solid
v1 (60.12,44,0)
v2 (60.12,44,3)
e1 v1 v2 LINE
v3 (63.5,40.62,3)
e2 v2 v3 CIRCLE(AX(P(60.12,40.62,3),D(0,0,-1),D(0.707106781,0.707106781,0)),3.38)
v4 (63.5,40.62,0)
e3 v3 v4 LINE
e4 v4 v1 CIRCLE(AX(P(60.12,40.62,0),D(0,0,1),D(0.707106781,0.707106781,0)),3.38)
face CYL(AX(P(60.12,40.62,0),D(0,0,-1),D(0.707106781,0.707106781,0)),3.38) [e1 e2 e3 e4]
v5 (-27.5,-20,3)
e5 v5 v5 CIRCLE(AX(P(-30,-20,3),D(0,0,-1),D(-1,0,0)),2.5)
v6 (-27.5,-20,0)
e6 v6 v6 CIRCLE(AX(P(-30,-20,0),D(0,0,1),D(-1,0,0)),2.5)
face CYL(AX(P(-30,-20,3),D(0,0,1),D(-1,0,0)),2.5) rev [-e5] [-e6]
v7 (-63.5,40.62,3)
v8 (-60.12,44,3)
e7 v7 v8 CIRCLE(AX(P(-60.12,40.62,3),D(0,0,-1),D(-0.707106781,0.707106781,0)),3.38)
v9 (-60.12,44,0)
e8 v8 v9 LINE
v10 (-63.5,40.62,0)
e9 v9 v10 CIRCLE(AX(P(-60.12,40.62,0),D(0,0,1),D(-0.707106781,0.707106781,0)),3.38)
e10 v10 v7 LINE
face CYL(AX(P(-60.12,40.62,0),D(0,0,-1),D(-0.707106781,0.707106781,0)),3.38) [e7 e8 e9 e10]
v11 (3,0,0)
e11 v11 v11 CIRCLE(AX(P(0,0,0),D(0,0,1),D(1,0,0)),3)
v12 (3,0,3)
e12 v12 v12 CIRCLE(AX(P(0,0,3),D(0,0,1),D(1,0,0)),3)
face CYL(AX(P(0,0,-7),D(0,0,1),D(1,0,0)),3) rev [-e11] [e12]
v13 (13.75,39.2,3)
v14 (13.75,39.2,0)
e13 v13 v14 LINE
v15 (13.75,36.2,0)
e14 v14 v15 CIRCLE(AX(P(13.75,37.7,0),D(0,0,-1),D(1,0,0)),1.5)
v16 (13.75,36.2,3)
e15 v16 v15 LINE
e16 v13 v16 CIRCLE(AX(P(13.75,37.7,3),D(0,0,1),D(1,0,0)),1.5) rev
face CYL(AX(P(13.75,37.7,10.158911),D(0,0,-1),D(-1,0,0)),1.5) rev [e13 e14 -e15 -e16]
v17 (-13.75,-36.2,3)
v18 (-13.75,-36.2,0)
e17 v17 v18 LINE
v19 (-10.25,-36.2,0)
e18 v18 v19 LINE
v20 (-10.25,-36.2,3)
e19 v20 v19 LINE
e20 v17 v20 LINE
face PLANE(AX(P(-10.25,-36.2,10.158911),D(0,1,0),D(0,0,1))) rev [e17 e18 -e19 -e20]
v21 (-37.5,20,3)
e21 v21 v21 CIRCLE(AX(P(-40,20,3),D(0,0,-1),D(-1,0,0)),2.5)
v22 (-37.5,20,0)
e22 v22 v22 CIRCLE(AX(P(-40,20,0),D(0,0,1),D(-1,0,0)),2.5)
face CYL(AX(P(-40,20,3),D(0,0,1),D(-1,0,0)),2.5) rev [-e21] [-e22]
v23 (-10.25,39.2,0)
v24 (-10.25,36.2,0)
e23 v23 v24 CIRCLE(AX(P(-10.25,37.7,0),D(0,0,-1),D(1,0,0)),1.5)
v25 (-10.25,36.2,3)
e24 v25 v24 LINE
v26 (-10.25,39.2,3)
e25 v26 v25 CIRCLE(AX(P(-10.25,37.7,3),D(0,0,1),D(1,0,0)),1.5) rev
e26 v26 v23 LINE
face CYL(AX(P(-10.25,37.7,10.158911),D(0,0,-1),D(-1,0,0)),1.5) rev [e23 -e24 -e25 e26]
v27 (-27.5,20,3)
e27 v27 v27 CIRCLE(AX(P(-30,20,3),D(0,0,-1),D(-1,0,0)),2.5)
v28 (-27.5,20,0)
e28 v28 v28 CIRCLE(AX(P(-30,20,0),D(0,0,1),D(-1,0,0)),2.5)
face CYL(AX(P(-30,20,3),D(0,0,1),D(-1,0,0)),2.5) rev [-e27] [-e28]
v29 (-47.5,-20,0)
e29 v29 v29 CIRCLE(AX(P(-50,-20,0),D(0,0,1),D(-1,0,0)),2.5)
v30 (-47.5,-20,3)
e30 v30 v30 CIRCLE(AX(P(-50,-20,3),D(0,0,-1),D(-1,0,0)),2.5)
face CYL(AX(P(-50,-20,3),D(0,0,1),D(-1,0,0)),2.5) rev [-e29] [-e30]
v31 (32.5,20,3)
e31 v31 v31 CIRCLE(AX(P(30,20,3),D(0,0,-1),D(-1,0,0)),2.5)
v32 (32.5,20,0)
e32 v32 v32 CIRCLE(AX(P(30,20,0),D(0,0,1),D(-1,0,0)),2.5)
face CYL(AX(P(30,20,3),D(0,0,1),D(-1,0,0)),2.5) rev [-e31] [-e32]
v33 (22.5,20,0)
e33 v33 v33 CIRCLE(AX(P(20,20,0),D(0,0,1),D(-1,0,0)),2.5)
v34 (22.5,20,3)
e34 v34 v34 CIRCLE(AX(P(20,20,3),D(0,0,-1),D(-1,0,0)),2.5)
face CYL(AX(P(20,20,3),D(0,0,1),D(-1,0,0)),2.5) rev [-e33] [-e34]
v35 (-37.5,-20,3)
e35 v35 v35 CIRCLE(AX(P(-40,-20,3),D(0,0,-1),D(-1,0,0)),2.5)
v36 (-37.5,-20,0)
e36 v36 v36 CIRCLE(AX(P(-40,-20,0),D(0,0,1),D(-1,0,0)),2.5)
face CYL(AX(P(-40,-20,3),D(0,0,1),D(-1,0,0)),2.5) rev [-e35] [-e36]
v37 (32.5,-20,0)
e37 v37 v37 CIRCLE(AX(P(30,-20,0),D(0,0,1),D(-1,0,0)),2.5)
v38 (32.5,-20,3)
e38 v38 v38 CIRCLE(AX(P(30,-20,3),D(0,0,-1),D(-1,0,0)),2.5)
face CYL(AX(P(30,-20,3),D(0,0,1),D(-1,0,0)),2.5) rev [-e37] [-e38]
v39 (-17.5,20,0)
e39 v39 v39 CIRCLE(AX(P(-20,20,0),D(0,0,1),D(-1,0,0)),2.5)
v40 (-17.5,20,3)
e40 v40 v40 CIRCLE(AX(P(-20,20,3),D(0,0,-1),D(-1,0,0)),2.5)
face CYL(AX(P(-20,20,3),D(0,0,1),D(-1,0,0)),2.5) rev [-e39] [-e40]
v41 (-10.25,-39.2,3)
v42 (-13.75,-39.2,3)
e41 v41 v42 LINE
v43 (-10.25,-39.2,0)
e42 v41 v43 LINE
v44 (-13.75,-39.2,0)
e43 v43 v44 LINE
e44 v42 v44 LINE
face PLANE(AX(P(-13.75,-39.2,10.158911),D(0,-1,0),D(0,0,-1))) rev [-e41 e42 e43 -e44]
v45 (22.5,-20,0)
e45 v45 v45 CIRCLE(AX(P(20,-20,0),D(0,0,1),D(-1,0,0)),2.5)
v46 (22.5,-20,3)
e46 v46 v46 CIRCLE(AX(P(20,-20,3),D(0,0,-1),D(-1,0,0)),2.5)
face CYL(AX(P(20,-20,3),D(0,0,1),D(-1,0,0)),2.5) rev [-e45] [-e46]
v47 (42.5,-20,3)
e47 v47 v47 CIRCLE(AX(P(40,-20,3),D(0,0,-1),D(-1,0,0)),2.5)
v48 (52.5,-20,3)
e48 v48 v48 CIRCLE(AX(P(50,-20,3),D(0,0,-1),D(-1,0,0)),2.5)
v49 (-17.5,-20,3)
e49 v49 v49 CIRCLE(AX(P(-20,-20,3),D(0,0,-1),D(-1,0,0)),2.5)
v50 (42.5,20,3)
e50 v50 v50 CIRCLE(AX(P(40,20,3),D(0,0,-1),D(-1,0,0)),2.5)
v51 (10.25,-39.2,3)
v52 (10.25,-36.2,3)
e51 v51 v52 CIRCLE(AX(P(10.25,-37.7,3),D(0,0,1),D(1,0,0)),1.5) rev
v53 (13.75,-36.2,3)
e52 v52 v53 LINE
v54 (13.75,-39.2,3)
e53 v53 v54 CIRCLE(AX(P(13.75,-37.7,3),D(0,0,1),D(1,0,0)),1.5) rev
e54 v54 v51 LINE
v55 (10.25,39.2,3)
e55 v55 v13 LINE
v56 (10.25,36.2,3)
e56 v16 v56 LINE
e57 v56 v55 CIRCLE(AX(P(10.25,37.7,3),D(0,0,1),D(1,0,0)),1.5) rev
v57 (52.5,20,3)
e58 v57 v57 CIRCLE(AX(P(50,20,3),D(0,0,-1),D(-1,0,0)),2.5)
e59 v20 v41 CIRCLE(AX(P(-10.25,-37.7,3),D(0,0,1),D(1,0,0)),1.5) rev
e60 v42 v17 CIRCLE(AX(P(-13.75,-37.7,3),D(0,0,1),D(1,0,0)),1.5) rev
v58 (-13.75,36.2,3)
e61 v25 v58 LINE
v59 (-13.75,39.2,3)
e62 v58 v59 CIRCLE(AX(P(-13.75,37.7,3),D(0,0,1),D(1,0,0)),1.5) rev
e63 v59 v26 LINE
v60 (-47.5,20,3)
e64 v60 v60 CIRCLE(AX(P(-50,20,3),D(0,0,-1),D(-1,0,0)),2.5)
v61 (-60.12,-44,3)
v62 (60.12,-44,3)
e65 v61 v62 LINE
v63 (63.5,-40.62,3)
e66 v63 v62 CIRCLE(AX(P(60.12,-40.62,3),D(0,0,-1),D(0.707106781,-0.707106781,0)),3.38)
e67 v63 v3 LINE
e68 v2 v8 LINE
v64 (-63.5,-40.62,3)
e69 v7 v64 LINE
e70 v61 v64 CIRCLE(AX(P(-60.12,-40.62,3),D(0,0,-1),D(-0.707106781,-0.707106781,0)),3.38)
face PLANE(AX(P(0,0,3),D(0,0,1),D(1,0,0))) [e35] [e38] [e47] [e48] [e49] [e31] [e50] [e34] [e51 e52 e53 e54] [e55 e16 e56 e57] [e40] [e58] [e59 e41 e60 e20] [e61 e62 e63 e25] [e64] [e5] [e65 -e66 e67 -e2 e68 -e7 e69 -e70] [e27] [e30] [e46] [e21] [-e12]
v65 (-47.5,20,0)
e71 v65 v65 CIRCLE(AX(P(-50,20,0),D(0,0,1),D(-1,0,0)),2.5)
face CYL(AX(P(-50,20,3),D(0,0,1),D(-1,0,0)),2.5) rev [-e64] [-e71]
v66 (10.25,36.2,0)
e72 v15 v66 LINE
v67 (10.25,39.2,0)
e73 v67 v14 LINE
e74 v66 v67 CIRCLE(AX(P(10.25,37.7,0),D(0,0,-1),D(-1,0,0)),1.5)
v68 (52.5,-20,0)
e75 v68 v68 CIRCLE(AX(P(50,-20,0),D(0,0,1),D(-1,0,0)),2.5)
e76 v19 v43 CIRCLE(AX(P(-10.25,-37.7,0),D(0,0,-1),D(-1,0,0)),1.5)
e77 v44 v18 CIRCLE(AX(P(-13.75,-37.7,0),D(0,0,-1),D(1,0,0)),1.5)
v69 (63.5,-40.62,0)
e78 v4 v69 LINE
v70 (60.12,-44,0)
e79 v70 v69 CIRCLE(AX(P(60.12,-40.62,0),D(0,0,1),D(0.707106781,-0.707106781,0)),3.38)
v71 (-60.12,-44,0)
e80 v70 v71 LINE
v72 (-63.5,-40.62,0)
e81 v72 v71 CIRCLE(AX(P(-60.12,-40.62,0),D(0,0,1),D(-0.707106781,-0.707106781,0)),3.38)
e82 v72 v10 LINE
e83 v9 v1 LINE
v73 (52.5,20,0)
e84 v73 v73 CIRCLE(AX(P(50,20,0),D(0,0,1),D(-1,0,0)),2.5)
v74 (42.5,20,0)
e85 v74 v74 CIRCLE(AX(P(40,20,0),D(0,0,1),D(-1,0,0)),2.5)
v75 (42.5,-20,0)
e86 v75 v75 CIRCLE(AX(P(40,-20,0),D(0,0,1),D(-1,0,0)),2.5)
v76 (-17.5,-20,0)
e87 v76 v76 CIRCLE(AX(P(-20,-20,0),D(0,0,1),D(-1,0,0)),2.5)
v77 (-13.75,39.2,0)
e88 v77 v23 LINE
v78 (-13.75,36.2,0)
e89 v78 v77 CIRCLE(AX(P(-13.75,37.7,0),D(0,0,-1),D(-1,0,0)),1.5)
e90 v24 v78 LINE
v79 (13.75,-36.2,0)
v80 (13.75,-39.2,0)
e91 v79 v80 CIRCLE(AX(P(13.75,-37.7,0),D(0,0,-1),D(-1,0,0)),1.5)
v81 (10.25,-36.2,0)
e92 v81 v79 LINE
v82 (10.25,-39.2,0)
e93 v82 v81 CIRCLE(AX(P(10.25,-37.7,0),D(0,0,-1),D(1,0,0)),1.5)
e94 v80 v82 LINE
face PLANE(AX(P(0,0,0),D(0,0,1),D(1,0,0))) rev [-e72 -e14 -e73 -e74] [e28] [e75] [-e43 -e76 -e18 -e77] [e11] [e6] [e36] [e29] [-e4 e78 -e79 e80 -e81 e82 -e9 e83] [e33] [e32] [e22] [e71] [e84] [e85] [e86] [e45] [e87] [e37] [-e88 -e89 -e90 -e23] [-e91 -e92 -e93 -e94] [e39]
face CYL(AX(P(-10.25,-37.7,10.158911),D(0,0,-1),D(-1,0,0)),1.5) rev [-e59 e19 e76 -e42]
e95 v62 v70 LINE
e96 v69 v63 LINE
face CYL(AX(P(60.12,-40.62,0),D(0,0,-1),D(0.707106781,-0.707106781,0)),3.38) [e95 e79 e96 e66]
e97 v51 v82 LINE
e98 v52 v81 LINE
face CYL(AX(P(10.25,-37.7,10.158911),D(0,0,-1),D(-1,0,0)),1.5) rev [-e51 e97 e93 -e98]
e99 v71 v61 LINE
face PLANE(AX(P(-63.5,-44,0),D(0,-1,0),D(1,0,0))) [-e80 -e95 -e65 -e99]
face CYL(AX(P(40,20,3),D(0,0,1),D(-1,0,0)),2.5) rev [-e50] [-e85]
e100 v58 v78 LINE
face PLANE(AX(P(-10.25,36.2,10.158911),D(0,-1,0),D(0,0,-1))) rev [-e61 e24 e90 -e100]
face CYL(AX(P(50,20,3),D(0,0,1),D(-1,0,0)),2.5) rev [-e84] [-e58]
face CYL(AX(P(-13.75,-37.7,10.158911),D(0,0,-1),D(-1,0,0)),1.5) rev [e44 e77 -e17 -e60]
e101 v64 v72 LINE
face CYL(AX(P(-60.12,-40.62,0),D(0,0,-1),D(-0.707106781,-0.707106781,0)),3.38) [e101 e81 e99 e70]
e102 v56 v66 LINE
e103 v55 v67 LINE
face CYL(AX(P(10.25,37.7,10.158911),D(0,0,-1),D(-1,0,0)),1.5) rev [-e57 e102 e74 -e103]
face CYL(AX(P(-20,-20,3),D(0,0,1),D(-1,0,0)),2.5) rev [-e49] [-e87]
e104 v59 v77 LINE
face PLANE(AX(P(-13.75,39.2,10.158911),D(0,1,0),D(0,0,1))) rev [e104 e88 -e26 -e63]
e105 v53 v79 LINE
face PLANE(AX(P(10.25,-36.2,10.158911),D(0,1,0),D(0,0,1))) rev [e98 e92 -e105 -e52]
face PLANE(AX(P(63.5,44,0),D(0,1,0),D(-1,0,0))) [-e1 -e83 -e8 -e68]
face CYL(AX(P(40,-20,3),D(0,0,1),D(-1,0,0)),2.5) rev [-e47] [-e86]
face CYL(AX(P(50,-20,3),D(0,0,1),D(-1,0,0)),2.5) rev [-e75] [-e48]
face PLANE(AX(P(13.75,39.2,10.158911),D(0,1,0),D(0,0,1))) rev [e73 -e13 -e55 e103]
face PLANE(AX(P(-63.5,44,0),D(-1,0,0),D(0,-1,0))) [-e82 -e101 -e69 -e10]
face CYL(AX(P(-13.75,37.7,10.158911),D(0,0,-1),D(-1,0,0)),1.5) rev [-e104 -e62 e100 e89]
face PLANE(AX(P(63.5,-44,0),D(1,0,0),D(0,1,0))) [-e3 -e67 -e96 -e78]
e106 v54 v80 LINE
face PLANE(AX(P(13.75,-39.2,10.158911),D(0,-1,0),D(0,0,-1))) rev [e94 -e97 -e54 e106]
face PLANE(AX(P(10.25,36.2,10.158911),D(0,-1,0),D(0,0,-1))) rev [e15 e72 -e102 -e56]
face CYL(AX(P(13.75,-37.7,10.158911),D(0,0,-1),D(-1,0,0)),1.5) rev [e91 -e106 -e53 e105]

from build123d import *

# Parameters (mm, degrees)
CUT_EXTRUDE1_START       = -3
CUT_EXTRUDE1_OUTLINE_R   = 2.5
CUT_EXTRUDE1_OUTLINE_R_2 = 3.6
CUT_EXTRUDE1_OUTLINE_R_3 = 3
CUT_EXTRUDE1_DEPTH       = 3
SKETCH2_R                = 3.6
SKETCH2_R_2              = 3.600483305
SKETCH2_R_3              = 2.5
BOSS_EXTRUDE2_DEPTH      = 3
BOSS_EXTRUDE3_DEPTH      = 3
CUT_EXTRUDE2_REACH       = 79.313
BOSS_EXTRUDE4_DEPTH      = 3
BOSS_EXTRUDE5_DEPTH      = 3


with BuildPart() as part:
    # Cut-Extrude1: read off the stored shape, not the designer's step
    # Cut-Extrude1 outline → Cut-Extrude1 (new body)
    with BuildSketch(Plane.XY.offset(3).offset(CUT_EXTRUDE1_START)):
        with BuildLine():
            ThreePointArc((-60.12, 44), (-62.51002092, 43.01002092), (-63.5, 40.62))
            Line((-63.5, 40.62), (-63.5, -40.62))
            ThreePointArc((-63.5, -40.62), (-62.51002092, -43.01002092), (-60.12, -44))
            Line((-60.12, -44), (60.12, -44))
            ThreePointArc((60.12, -44), (62.51002092, -43.01002092), (63.5, -40.62))
            Line((63.5, -40.62), (63.5, 40.62))
            ThreePointArc((63.5, 40.62), (62.51002092, 43.01002092), (60.12, 44))
            Line((60.12, 44), (-60.12, 44))
        make_face()
        with Locations((-50, -30)):
            Circle(CUT_EXTRUDE1_OUTLINE_R, mode=Mode.SUBTRACT)
        with Locations((-40, -30)):
            Circle(CUT_EXTRUDE1_OUTLINE_R, mode=Mode.SUBTRACT)
        with BuildLine():
            ThreePointArc((-16.9, -36.2), (-15.4, -37.7), (-16.9, -39.2))
            Line((-16.9, -39.2), (-23.4, -39.2))
            ThreePointArc((-23.4, -39.2), (-24.9, -37.7), (-23.4, -36.2))
            Line((-23.4, -36.2), (-16.9, -36.2))
        make_face(mode=Mode.SUBTRACT)
        with Locations((-30, -30)):
            Circle(CUT_EXTRUDE1_OUTLINE_R, mode=Mode.SUBTRACT)
        with Locations((-20, -30)):
            Circle(CUT_EXTRUDE1_OUTLINE_R, mode=Mode.SUBTRACT)
        with Locations((-50, -20)):
            Circle(CUT_EXTRUDE1_OUTLINE_R, mode=Mode.SUBTRACT)
        with Locations((-40, -20)):
            Circle(CUT_EXTRUDE1_OUTLINE_R, mode=Mode.SUBTRACT)
        with Locations((-30, -20)):
            Circle(CUT_EXTRUDE1_OUTLINE_R, mode=Mode.SUBTRACT)
        with Locations((-20, -20)):
            Circle(CUT_EXTRUDE1_OUTLINE_R, mode=Mode.SUBTRACT)
        with Locations((-10, -20)):
            Circle(CUT_EXTRUDE1_OUTLINE_R, mode=Mode.SUBTRACT)
        with Locations((-14.142135624, -14.142135624)):
            Circle(CUT_EXTRUDE1_OUTLINE_R, mode=Mode.SUBTRACT)
        with Locations((-30, -10)):
            Circle(CUT_EXTRUDE1_OUTLINE_R, mode=Mode.SUBTRACT)
        with Locations((-20, -10)):
            Circle(CUT_EXTRUDE1_OUTLINE_R, mode=Mode.SUBTRACT)
        with BuildLine():
            ThreePointArc((-3.25, -39.2), (-4.75, -37.7), (-3.25, -36.2))
            Line((-3.25, -36.2), (3.25, -36.2))
            ThreePointArc((3.25, -36.2), (4.75, -37.7), (3.25, -39.2))
            Line((3.25, -39.2), (-3.25, -39.2))
        make_face(mode=Mode.SUBTRACT)
        with BuildLine():
            ThreePointArc((23.4, -36.2), (24.9, -37.7), (23.4, -39.2))
            Line((23.4, -39.2), (16.9, -39.2))
            ThreePointArc((16.9, -39.2), (15.4, -37.7), (16.9, -36.2))
            Line((16.9, -36.2), (23.4, -36.2))
        make_face(mode=Mode.SUBTRACT)
        with BuildLine():
            ThreePointArc((10, -27.5), (12.5, -30), (10, -32.5))
            Line((10, -32.5), (-10, -32.5))
            ThreePointArc((-10, -32.5), (-12.5, -30), (-10, -27.5))
            Line((-10, -27.5), (10, -27.5))
        make_face(mode=Mode.SUBTRACT)
        with Locations((20, -30)):
            Circle(CUT_EXTRUDE1_OUTLINE_R_2, mode=Mode.SUBTRACT)
        with Locations((30, -30)):
            Circle(CUT_EXTRUDE1_OUTLINE_R_2, mode=Mode.SUBTRACT)
        with Locations((40, -30)):
            Circle(CUT_EXTRUDE1_OUTLINE_R_2, mode=Mode.SUBTRACT)
        with Locations((50, -30)):
            Circle(CUT_EXTRUDE1_OUTLINE_R_2, mode=Mode.SUBTRACT)
        with Locations((0, -20)):
            Circle(CUT_EXTRUDE1_OUTLINE_R, mode=Mode.SUBTRACT)
        with Locations((10, -20)):
            Circle(CUT_EXTRUDE1_OUTLINE_R, mode=Mode.SUBTRACT)
        with Locations((14.142135624, -14.142135624)):
            Circle(CUT_EXTRUDE1_OUTLINE_R, mode=Mode.SUBTRACT)
        with Locations((20, -20)):
            Circle(CUT_EXTRUDE1_OUTLINE_R, mode=Mode.SUBTRACT)
        with Locations((30, -20)):
            Circle(CUT_EXTRUDE1_OUTLINE_R, mode=Mode.SUBTRACT)
        with Locations((0, -10)):
            Circle(CUT_EXTRUDE1_OUTLINE_R, mode=Mode.SUBTRACT)
        with Locations((20, -10)):
            Circle(CUT_EXTRUDE1_OUTLINE_R, mode=Mode.SUBTRACT)
        with Locations((30, -10)):
            Circle(CUT_EXTRUDE1_OUTLINE_R, mode=Mode.SUBTRACT)
        with Locations((40, -20)):
            Circle(CUT_EXTRUDE1_OUTLINE_R, mode=Mode.SUBTRACT)
        with Locations((50, -20)):
            Circle(CUT_EXTRUDE1_OUTLINE_R, mode=Mode.SUBTRACT)
        with Locations((-50, 0)):
            Circle(CUT_EXTRUDE1_OUTLINE_R, mode=Mode.SUBTRACT)
        with Locations((-40, 0)):
            Circle(CUT_EXTRUDE1_OUTLINE_R, mode=Mode.SUBTRACT)
        with Locations((-50, 20)):
            Circle(CUT_EXTRUDE1_OUTLINE_R, mode=Mode.SUBTRACT)
        with Locations((-40, 20)):
            Circle(CUT_EXTRUDE1_OUTLINE_R, mode=Mode.SUBTRACT)
        with Locations((-30, 0)):
            Circle(CUT_EXTRUDE1_OUTLINE_R, mode=Mode.SUBTRACT)
        with Locations((-20, 0)):
            Circle(CUT_EXTRUDE1_OUTLINE_R, mode=Mode.SUBTRACT)
        with Locations((-30, 10)):
            Circle(CUT_EXTRUDE1_OUTLINE_R, mode=Mode.SUBTRACT)
        with Locations((-20, 10)):
            Circle(CUT_EXTRUDE1_OUTLINE_R, mode=Mode.SUBTRACT)
        with Locations((-10, 0)):
            Circle(CUT_EXTRUDE1_OUTLINE_R, mode=Mode.SUBTRACT)
        with Locations((-30, 20)):
            Circle(CUT_EXTRUDE1_OUTLINE_R, mode=Mode.SUBTRACT)
        with Locations((-20, 20)):
            Circle(CUT_EXTRUDE1_OUTLINE_R, mode=Mode.SUBTRACT)
        with Locations((-14.142135624, 14.142135624)):
            Circle(CUT_EXTRUDE1_OUTLINE_R, mode=Mode.SUBTRACT)
        with Locations((-10, 20)):
            Circle(CUT_EXTRUDE1_OUTLINE_R, mode=Mode.SUBTRACT)
        with Locations((-50, 30)):
            Circle(CUT_EXTRUDE1_OUTLINE_R, mode=Mode.SUBTRACT)
        with Locations((-40, 30)):
            Circle(CUT_EXTRUDE1_OUTLINE_R, mode=Mode.SUBTRACT)
        with Locations((-30, 30)):
            Circle(CUT_EXTRUDE1_OUTLINE_R, mode=Mode.SUBTRACT)
        with Locations((-20, 30)):
            Circle(CUT_EXTRUDE1_OUTLINE_R, mode=Mode.SUBTRACT)
        with BuildLine():
            ThreePointArc((-23.4, 36.2), (-24.9, 37.7), (-23.4, 39.2))
            Line((-23.4, 39.2), (-16.9, 39.2))
            ThreePointArc((-16.9, 39.2), (-15.4, 37.7), (-16.9, 36.2))
            Line((-16.9, 36.2), (-23.4, 36.2))
        make_face(mode=Mode.SUBTRACT)
        Circle(CUT_EXTRUDE1_OUTLINE_R_3, mode=Mode.SUBTRACT)
        with Locations((10, 0)):
            Circle(CUT_EXTRUDE1_OUTLINE_R, mode=Mode.SUBTRACT)
        with Locations((0, 10)):
            Circle(CUT_EXTRUDE1_OUTLINE_R, mode=Mode.SUBTRACT)
        with Locations((20, 0)):
            Circle(CUT_EXTRUDE1_OUTLINE_R_2, mode=Mode.SUBTRACT)
        with Locations((30, 0)):
            Circle(CUT_EXTRUDE1_OUTLINE_R_2, mode=Mode.SUBTRACT)
        with Locations((20, 10)):
            Circle(CUT_EXTRUDE1_OUTLINE_R, mode=Mode.SUBTRACT)
        with Locations((30, 10)):
            Circle(CUT_EXTRUDE1_OUTLINE_R, mode=Mode.SUBTRACT)
        with Locations((14.142135624, 14.142135624)):
            Circle(CUT_EXTRUDE1_OUTLINE_R, mode=Mode.SUBTRACT)
        with Locations((0, 20)):
            Circle(CUT_EXTRUDE1_OUTLINE_R, mode=Mode.SUBTRACT)
        with Locations((10, 20)):
            Circle(CUT_EXTRUDE1_OUTLINE_R, mode=Mode.SUBTRACT)
        with Locations((20, 20)):
            Circle(CUT_EXTRUDE1_OUTLINE_R, mode=Mode.SUBTRACT)
        with Locations((30, 20)):
            Circle(CUT_EXTRUDE1_OUTLINE_R, mode=Mode.SUBTRACT)
        with Locations((40, 0)):
            Circle(CUT_EXTRUDE1_OUTLINE_R_2, mode=Mode.SUBTRACT)
        with Locations((50, 0)):
            Circle(CUT_EXTRUDE1_OUTLINE_R_2, mode=Mode.SUBTRACT)
        with Locations((40, 20)):
            Circle(CUT_EXTRUDE1_OUTLINE_R, mode=Mode.SUBTRACT)
        with Locations((50, 20)):
            Circle(CUT_EXTRUDE1_OUTLINE_R, mode=Mode.SUBTRACT)
        with BuildLine():
            ThreePointArc((10, 32.5), (12.5, 30), (10, 27.5))
            Line((10, 27.5), (-10, 27.5))
            ThreePointArc((-10, 27.5), (-12.5, 30), (-10, 32.5))
            Line((-10, 32.5), (10, 32.5))
        make_face(mode=Mode.SUBTRACT)
        with Locations((20, 30)):
            Circle(CUT_EXTRUDE1_OUTLINE_R_2, mode=Mode.SUBTRACT)
        with Locations((30, 30)):
            Circle(CUT_EXTRUDE1_OUTLINE_R_2, mode=Mode.SUBTRACT)
        with BuildLine():
            ThreePointArc((-3.25, 36.2), (-4.75, 37.7), (-3.25, 39.2))
            Line((-3.25, 39.2), (3.25, 39.2))
            ThreePointArc((3.25, 39.2), (4.75, 37.7), (3.25, 36.2))
            Line((3.25, 36.2), (-3.25, 36.2))
        make_face(mode=Mode.SUBTRACT)
        with BuildLine():
            ThreePointArc((16.9, 36.2), (15.4, 37.7), (16.9, 39.2))
            Line((16.9, 39.2), (23.4, 39.2))
            ThreePointArc((23.4, 39.2), (24.9, 37.7), (23.4, 36.2))
            Line((23.4, 36.2), (16.9, 36.2))
        make_face(mode=Mode.SUBTRACT)
        with Locations((40, 30)):
            Circle(CUT_EXTRUDE1_OUTLINE_R_2, mode=Mode.SUBTRACT)
        with Locations((50, 30)):
            Circle(CUT_EXTRUDE1_OUTLINE_R_2, mode=Mode.SUBTRACT)
    extrude(amount=CUT_EXTRUDE1_DEPTH)

    # Sketch2 → Boss-Extrude2 (add)
    with BuildSketch(Plane(origin=(0, 0, 0), x_dir=(-1, 0, 0), z_dir=(0, 0, -1))):
        with Locations((-40, 30)):
            Circle(SKETCH2_R)
        with Locations((-50, 30)):
            Circle(SKETCH2_R_2)
        with Locations((-30, 30)):
            Circle(SKETCH2_R_2)
        with Locations((-30, -30)):
            Circle(SKETCH2_R)
        with Locations((-50, -30)):
            Circle(SKETCH2_R)
        with Locations((-20, -30)):
            Circle(SKETCH2_R)
        with Locations((-50, 0)):
            Circle(SKETCH2_R)
        with Locations((-30, 0)):
            Circle(SKETCH2_R)
        with Locations((-20, 0)):
            Circle(SKETCH2_R)
        with Locations((-14.142135624, 14.142135624)):
            Circle(SKETCH2_R_3)
        with Locations((-10, 20)):
            Circle(SKETCH2_R_3)
        with Locations((0, 20)):
            Circle(SKETCH2_R_3)
        with Locations((10, 20)):
            Circle(SKETCH2_R_3)
        with Locations((14.142135624, 14.142135624)):
            Circle(SKETCH2_R_3)
        with Locations((0, 10)):
            Circle(SKETCH2_R_3)
        with Locations((-10, 0)):
            Circle(SKETCH2_R_3)
        with Locations((0, -10)):
            Circle(SKETCH2_R_3)
        with Locations((10, 0)):
            Circle(SKETCH2_R_3)
        with Locations((-14.142135624, -14.142135624)):
            Circle(SKETCH2_R_3)
        with Locations((-10, -20)):
            Circle(SKETCH2_R_3)
        with Locations((0, -20)):
            Circle(SKETCH2_R_3)
        with Locations((10, -20)):
            Circle(SKETCH2_R_3)
        with Locations((14.142135624, -14.142135624)):
            Circle(SKETCH2_R_3)
        with Locations((20, 30)):
            Circle(SKETCH2_R_3)
        with Locations((30, 30)):
            Circle(SKETCH2_R_3)
        with Locations((40, 30)):
            Circle(SKETCH2_R_3)
        with Locations((50, 30)):
            Circle(SKETCH2_R_3)
        with Locations((50, -30)):
            Circle(SKETCH2_R_3)
        with Locations((40, -30)):
            Circle(SKETCH2_R_3)
        with Locations((30, -30)):
            Circle(SKETCH2_R_3)
        with Locations((20, -30)):
            Circle(SKETCH2_R_3)
        with Locations((30, 10)):
            Circle(SKETCH2_R_3)
        with Locations((20, 10)):
            Circle(SKETCH2_R_3)
        with Locations((30, -10)):
            Circle(SKETCH2_R_3)
        with Locations((20, -10)):
            Circle(SKETCH2_R_3)
        with Locations((-20, -10)):
            Circle(SKETCH2_R_3)
        with Locations((-30, -10)):
            Circle(SKETCH2_R_3)
        with Locations((-40, -30)):
            Circle(SKETCH2_R)
        with Locations((-20, 30)):
            Circle(SKETCH2_R)
        with Locations((-40, 0)):
            Circle(SKETCH2_R)
        with Locations((-30, 10)):
            Circle(SKETCH2_R_3)
        with Locations((-20, 10)):
            Circle(SKETCH2_R_3)
        with Locations((40, 0)):
            Circle(SKETCH2_R_3)
        with Locations((50, 0)):
            Circle(SKETCH2_R_3)
        with Locations((30, 0)):
            Circle(SKETCH2_R_3)
        with Locations((20, 0)):
            Circle(SKETCH2_R_3)
    extrude(amount=-BOSS_EXTRUDE2_DEPTH)

    # Sketch3 → Boss-Extrude3 (add)
    with BuildSketch(Plane(origin=(0, 0, 0), x_dir=(-1, 0, 0), z_dir=(0, 0, -1))):
        with BuildLine():
            Line((3.25, 39.2), (-3.25, 39.2))
            ThreePointArc((-3.25, 39.2), (-4.75, 37.7), (-3.25, 36.2))
            Line((-3.25, 36.2), (3.25, 36.2))
            ThreePointArc((3.25, 36.2), (4.75, 37.7), (3.25, 39.2))
        make_face()
        with BuildLine():
            Line((3.25, -36.2), (-3.25, -36.2))
            ThreePointArc((-3.25, -36.2), (-4.75, -37.7), (-3.25, -39.2))
            Line((-3.25, -39.2), (3.25, -39.2))
            ThreePointArc((3.25, -39.2), (4.75, -37.7), (3.25, -36.2))
        make_face()
    extrude(amount=-BOSS_EXTRUDE3_DEPTH)

    # Sketch4 → Cut-Extrude2 (cut, up to next)
    with BuildSketch(Plane(origin=(0, 0, 0), x_dir=(-1, 0, 0), z_dir=(0, 0, -1)), mode=Mode.PRIVATE) as cut_extrude2_sk1:
        with BuildLine():
            Line((-10.25, -36.2), (-13.75, -36.2))
            ThreePointArc((-13.75, -36.2), (-15.25, -37.7), (-13.75, -39.2))
            Line((-13.75, -39.2), (-10.25, -39.2))
            ThreePointArc((-10.25, -39.2), (-8.75, -37.7), (-10.25, -36.2))
        make_face()
    cut_extrude2_tool1 = extrude(cut_extrude2_sk1.sketch, amount=-CUT_EXTRUDE2_REACH, mode=Mode.PRIVATE) & part.part
    # Sketch4 → Cut-Extrude2 (cut, up to next)
    with BuildSketch(Plane(origin=(0, 0, 0), x_dir=(-1, 0, 0), z_dir=(0, 0, -1)), mode=Mode.PRIVATE) as cut_extrude2_sk2:
        with BuildLine():
            Line((-13.75, 39.2), (-10.25, 39.2))
            ThreePointArc((-10.25, 39.2), (-8.75, 37.7), (-10.25, 36.2))
            Line((-10.25, 36.2), (-13.75, 36.2))
            ThreePointArc((-13.75, 36.2), (-15.25, 37.7), (-13.75, 39.2))
        make_face()
    cut_extrude2_tool2 = extrude(cut_extrude2_sk2.sketch, amount=-CUT_EXTRUDE2_REACH, mode=Mode.PRIVATE) & part.part
    # Sketch4 → Cut-Extrude2 (cut, up to next)
    with BuildSketch(Plane(origin=(0, 0, 0), x_dir=(-1, 0, 0), z_dir=(0, 0, -1)), mode=Mode.PRIVATE) as cut_extrude2_sk3:
        with BuildLine():
            Line((10.25, 36.2), (13.75, 36.2))
            ThreePointArc((13.75, 36.2), (15.25, 37.7), (13.75, 39.2))
            Line((13.75, 39.2), (10.25, 39.2))
            ThreePointArc((10.25, 39.2), (8.75, 37.7), (10.25, 36.2))
        make_face()
    cut_extrude2_tool3 = extrude(cut_extrude2_sk3.sketch, amount=-CUT_EXTRUDE2_REACH, mode=Mode.PRIVATE) & part.part
    # Sketch4 → Cut-Extrude2 (cut, up to next)
    with BuildSketch(Plane(origin=(0, 0, 0), x_dir=(-1, 0, 0), z_dir=(0, 0, -1)), mode=Mode.PRIVATE) as cut_extrude2_sk4:
        with BuildLine():
            Line((13.75, -39.2), (10.25, -39.2))
            ThreePointArc((10.25, -39.2), (8.75, -37.7), (10.25, -36.2))
            Line((10.25, -36.2), (13.75, -36.2))
            ThreePointArc((13.75, -36.2), (15.25, -37.7), (13.75, -39.2))
        make_face()
    cut_extrude2_tool4 = extrude(cut_extrude2_sk4.sketch, amount=-CUT_EXTRUDE2_REACH, mode=Mode.PRIVATE) & part.part
    add(cut_extrude2_tool1.solids().sort_by_distance((12, -37.7, 0))[0], mode=Mode.SUBTRACT)
    add(cut_extrude2_tool2.solids().sort_by_distance((12, 37.7, 0))[0], mode=Mode.SUBTRACT)
    add(cut_extrude2_tool3.solids().sort_by_distance((-12, 37.7, 0))[0], mode=Mode.SUBTRACT)
    add(cut_extrude2_tool4.solids().sort_by_distance((-12, -37.7, 0))[0], mode=Mode.SUBTRACT)

    # Sketch5 → Boss-Extrude4 (add)
    with BuildSketch(Plane(origin=(0, 0, 0), x_dir=(-1, 0, 0), z_dir=(0, 0, -1))):
        with BuildLine():
            Line((-16.9, -36.2), (-23.4, -36.2))
            ThreePointArc((-23.4, -36.2), (-24.9, -37.7), (-23.4, -39.2))
            Line((-23.4, -39.2), (-16.9, -39.2))
            ThreePointArc((-16.9, -39.2), (-15.4, -37.7), (-16.9, -36.2))
        make_face()
        with BuildLine():
            Line((-16.9, 39.2), (-23.4, 39.2))
            ThreePointArc((-23.4, 39.2), (-24.9, 37.7), (-23.4, 36.2))
            Line((-23.4, 36.2), (-16.9, 36.2))
            ThreePointArc((-16.9, 36.2), (-15.4, 37.7), (-16.9, 39.2))
        make_face()
        with BuildLine():
            Line((16.9, 36.2), (23.4, 36.2))
            ThreePointArc((23.4, 36.2), (24.9, 37.7), (23.4, 39.2))
            Line((23.4, 39.2), (16.9, 39.2))
            ThreePointArc((16.9, 39.2), (15.4, 37.7), (16.9, 36.2))
        make_face()
        with BuildLine():
            Line((16.9, -39.2), (23.4, -39.2))
            ThreePointArc((23.4, -39.2), (24.9, -37.7), (23.4, -36.2))
            Line((23.4, -36.2), (16.9, -36.2))
            ThreePointArc((16.9, -36.2), (15.4, -37.7), (16.9, -39.2))
        make_face()
    extrude(amount=-BOSS_EXTRUDE4_DEPTH)

    # Sketch6 → Boss-Extrude5 (add)
    with BuildSketch(Plane(origin=(0, 0, 0), x_dir=(-1, 0, 0), z_dir=(0, 0, -1))):
        with BuildLine():
            Line((10, 32.5), (-10, 32.5))
            ThreePointArc((-10, 32.5), (-12.5, 30), (-10, 27.5))
            Line((-10, 27.5), (10, 27.5))
            ThreePointArc((10, 27.5), (12.5, 30), (10, 32.5))
        make_face()
        with BuildLine():
            Line((10, -27.5), (-10, -27.5))
            ThreePointArc((-10, -27.5), (-12.5, -30), (-10, -32.5))
            Line((-10, -32.5), (10, -32.5))
            ThreePointArc((10, -32.5), (12.5, -30), (10, -27.5))
        make_face()
    extrude(amount=-BOSS_EXTRUDE5_DEPTH)


solid = part.part
